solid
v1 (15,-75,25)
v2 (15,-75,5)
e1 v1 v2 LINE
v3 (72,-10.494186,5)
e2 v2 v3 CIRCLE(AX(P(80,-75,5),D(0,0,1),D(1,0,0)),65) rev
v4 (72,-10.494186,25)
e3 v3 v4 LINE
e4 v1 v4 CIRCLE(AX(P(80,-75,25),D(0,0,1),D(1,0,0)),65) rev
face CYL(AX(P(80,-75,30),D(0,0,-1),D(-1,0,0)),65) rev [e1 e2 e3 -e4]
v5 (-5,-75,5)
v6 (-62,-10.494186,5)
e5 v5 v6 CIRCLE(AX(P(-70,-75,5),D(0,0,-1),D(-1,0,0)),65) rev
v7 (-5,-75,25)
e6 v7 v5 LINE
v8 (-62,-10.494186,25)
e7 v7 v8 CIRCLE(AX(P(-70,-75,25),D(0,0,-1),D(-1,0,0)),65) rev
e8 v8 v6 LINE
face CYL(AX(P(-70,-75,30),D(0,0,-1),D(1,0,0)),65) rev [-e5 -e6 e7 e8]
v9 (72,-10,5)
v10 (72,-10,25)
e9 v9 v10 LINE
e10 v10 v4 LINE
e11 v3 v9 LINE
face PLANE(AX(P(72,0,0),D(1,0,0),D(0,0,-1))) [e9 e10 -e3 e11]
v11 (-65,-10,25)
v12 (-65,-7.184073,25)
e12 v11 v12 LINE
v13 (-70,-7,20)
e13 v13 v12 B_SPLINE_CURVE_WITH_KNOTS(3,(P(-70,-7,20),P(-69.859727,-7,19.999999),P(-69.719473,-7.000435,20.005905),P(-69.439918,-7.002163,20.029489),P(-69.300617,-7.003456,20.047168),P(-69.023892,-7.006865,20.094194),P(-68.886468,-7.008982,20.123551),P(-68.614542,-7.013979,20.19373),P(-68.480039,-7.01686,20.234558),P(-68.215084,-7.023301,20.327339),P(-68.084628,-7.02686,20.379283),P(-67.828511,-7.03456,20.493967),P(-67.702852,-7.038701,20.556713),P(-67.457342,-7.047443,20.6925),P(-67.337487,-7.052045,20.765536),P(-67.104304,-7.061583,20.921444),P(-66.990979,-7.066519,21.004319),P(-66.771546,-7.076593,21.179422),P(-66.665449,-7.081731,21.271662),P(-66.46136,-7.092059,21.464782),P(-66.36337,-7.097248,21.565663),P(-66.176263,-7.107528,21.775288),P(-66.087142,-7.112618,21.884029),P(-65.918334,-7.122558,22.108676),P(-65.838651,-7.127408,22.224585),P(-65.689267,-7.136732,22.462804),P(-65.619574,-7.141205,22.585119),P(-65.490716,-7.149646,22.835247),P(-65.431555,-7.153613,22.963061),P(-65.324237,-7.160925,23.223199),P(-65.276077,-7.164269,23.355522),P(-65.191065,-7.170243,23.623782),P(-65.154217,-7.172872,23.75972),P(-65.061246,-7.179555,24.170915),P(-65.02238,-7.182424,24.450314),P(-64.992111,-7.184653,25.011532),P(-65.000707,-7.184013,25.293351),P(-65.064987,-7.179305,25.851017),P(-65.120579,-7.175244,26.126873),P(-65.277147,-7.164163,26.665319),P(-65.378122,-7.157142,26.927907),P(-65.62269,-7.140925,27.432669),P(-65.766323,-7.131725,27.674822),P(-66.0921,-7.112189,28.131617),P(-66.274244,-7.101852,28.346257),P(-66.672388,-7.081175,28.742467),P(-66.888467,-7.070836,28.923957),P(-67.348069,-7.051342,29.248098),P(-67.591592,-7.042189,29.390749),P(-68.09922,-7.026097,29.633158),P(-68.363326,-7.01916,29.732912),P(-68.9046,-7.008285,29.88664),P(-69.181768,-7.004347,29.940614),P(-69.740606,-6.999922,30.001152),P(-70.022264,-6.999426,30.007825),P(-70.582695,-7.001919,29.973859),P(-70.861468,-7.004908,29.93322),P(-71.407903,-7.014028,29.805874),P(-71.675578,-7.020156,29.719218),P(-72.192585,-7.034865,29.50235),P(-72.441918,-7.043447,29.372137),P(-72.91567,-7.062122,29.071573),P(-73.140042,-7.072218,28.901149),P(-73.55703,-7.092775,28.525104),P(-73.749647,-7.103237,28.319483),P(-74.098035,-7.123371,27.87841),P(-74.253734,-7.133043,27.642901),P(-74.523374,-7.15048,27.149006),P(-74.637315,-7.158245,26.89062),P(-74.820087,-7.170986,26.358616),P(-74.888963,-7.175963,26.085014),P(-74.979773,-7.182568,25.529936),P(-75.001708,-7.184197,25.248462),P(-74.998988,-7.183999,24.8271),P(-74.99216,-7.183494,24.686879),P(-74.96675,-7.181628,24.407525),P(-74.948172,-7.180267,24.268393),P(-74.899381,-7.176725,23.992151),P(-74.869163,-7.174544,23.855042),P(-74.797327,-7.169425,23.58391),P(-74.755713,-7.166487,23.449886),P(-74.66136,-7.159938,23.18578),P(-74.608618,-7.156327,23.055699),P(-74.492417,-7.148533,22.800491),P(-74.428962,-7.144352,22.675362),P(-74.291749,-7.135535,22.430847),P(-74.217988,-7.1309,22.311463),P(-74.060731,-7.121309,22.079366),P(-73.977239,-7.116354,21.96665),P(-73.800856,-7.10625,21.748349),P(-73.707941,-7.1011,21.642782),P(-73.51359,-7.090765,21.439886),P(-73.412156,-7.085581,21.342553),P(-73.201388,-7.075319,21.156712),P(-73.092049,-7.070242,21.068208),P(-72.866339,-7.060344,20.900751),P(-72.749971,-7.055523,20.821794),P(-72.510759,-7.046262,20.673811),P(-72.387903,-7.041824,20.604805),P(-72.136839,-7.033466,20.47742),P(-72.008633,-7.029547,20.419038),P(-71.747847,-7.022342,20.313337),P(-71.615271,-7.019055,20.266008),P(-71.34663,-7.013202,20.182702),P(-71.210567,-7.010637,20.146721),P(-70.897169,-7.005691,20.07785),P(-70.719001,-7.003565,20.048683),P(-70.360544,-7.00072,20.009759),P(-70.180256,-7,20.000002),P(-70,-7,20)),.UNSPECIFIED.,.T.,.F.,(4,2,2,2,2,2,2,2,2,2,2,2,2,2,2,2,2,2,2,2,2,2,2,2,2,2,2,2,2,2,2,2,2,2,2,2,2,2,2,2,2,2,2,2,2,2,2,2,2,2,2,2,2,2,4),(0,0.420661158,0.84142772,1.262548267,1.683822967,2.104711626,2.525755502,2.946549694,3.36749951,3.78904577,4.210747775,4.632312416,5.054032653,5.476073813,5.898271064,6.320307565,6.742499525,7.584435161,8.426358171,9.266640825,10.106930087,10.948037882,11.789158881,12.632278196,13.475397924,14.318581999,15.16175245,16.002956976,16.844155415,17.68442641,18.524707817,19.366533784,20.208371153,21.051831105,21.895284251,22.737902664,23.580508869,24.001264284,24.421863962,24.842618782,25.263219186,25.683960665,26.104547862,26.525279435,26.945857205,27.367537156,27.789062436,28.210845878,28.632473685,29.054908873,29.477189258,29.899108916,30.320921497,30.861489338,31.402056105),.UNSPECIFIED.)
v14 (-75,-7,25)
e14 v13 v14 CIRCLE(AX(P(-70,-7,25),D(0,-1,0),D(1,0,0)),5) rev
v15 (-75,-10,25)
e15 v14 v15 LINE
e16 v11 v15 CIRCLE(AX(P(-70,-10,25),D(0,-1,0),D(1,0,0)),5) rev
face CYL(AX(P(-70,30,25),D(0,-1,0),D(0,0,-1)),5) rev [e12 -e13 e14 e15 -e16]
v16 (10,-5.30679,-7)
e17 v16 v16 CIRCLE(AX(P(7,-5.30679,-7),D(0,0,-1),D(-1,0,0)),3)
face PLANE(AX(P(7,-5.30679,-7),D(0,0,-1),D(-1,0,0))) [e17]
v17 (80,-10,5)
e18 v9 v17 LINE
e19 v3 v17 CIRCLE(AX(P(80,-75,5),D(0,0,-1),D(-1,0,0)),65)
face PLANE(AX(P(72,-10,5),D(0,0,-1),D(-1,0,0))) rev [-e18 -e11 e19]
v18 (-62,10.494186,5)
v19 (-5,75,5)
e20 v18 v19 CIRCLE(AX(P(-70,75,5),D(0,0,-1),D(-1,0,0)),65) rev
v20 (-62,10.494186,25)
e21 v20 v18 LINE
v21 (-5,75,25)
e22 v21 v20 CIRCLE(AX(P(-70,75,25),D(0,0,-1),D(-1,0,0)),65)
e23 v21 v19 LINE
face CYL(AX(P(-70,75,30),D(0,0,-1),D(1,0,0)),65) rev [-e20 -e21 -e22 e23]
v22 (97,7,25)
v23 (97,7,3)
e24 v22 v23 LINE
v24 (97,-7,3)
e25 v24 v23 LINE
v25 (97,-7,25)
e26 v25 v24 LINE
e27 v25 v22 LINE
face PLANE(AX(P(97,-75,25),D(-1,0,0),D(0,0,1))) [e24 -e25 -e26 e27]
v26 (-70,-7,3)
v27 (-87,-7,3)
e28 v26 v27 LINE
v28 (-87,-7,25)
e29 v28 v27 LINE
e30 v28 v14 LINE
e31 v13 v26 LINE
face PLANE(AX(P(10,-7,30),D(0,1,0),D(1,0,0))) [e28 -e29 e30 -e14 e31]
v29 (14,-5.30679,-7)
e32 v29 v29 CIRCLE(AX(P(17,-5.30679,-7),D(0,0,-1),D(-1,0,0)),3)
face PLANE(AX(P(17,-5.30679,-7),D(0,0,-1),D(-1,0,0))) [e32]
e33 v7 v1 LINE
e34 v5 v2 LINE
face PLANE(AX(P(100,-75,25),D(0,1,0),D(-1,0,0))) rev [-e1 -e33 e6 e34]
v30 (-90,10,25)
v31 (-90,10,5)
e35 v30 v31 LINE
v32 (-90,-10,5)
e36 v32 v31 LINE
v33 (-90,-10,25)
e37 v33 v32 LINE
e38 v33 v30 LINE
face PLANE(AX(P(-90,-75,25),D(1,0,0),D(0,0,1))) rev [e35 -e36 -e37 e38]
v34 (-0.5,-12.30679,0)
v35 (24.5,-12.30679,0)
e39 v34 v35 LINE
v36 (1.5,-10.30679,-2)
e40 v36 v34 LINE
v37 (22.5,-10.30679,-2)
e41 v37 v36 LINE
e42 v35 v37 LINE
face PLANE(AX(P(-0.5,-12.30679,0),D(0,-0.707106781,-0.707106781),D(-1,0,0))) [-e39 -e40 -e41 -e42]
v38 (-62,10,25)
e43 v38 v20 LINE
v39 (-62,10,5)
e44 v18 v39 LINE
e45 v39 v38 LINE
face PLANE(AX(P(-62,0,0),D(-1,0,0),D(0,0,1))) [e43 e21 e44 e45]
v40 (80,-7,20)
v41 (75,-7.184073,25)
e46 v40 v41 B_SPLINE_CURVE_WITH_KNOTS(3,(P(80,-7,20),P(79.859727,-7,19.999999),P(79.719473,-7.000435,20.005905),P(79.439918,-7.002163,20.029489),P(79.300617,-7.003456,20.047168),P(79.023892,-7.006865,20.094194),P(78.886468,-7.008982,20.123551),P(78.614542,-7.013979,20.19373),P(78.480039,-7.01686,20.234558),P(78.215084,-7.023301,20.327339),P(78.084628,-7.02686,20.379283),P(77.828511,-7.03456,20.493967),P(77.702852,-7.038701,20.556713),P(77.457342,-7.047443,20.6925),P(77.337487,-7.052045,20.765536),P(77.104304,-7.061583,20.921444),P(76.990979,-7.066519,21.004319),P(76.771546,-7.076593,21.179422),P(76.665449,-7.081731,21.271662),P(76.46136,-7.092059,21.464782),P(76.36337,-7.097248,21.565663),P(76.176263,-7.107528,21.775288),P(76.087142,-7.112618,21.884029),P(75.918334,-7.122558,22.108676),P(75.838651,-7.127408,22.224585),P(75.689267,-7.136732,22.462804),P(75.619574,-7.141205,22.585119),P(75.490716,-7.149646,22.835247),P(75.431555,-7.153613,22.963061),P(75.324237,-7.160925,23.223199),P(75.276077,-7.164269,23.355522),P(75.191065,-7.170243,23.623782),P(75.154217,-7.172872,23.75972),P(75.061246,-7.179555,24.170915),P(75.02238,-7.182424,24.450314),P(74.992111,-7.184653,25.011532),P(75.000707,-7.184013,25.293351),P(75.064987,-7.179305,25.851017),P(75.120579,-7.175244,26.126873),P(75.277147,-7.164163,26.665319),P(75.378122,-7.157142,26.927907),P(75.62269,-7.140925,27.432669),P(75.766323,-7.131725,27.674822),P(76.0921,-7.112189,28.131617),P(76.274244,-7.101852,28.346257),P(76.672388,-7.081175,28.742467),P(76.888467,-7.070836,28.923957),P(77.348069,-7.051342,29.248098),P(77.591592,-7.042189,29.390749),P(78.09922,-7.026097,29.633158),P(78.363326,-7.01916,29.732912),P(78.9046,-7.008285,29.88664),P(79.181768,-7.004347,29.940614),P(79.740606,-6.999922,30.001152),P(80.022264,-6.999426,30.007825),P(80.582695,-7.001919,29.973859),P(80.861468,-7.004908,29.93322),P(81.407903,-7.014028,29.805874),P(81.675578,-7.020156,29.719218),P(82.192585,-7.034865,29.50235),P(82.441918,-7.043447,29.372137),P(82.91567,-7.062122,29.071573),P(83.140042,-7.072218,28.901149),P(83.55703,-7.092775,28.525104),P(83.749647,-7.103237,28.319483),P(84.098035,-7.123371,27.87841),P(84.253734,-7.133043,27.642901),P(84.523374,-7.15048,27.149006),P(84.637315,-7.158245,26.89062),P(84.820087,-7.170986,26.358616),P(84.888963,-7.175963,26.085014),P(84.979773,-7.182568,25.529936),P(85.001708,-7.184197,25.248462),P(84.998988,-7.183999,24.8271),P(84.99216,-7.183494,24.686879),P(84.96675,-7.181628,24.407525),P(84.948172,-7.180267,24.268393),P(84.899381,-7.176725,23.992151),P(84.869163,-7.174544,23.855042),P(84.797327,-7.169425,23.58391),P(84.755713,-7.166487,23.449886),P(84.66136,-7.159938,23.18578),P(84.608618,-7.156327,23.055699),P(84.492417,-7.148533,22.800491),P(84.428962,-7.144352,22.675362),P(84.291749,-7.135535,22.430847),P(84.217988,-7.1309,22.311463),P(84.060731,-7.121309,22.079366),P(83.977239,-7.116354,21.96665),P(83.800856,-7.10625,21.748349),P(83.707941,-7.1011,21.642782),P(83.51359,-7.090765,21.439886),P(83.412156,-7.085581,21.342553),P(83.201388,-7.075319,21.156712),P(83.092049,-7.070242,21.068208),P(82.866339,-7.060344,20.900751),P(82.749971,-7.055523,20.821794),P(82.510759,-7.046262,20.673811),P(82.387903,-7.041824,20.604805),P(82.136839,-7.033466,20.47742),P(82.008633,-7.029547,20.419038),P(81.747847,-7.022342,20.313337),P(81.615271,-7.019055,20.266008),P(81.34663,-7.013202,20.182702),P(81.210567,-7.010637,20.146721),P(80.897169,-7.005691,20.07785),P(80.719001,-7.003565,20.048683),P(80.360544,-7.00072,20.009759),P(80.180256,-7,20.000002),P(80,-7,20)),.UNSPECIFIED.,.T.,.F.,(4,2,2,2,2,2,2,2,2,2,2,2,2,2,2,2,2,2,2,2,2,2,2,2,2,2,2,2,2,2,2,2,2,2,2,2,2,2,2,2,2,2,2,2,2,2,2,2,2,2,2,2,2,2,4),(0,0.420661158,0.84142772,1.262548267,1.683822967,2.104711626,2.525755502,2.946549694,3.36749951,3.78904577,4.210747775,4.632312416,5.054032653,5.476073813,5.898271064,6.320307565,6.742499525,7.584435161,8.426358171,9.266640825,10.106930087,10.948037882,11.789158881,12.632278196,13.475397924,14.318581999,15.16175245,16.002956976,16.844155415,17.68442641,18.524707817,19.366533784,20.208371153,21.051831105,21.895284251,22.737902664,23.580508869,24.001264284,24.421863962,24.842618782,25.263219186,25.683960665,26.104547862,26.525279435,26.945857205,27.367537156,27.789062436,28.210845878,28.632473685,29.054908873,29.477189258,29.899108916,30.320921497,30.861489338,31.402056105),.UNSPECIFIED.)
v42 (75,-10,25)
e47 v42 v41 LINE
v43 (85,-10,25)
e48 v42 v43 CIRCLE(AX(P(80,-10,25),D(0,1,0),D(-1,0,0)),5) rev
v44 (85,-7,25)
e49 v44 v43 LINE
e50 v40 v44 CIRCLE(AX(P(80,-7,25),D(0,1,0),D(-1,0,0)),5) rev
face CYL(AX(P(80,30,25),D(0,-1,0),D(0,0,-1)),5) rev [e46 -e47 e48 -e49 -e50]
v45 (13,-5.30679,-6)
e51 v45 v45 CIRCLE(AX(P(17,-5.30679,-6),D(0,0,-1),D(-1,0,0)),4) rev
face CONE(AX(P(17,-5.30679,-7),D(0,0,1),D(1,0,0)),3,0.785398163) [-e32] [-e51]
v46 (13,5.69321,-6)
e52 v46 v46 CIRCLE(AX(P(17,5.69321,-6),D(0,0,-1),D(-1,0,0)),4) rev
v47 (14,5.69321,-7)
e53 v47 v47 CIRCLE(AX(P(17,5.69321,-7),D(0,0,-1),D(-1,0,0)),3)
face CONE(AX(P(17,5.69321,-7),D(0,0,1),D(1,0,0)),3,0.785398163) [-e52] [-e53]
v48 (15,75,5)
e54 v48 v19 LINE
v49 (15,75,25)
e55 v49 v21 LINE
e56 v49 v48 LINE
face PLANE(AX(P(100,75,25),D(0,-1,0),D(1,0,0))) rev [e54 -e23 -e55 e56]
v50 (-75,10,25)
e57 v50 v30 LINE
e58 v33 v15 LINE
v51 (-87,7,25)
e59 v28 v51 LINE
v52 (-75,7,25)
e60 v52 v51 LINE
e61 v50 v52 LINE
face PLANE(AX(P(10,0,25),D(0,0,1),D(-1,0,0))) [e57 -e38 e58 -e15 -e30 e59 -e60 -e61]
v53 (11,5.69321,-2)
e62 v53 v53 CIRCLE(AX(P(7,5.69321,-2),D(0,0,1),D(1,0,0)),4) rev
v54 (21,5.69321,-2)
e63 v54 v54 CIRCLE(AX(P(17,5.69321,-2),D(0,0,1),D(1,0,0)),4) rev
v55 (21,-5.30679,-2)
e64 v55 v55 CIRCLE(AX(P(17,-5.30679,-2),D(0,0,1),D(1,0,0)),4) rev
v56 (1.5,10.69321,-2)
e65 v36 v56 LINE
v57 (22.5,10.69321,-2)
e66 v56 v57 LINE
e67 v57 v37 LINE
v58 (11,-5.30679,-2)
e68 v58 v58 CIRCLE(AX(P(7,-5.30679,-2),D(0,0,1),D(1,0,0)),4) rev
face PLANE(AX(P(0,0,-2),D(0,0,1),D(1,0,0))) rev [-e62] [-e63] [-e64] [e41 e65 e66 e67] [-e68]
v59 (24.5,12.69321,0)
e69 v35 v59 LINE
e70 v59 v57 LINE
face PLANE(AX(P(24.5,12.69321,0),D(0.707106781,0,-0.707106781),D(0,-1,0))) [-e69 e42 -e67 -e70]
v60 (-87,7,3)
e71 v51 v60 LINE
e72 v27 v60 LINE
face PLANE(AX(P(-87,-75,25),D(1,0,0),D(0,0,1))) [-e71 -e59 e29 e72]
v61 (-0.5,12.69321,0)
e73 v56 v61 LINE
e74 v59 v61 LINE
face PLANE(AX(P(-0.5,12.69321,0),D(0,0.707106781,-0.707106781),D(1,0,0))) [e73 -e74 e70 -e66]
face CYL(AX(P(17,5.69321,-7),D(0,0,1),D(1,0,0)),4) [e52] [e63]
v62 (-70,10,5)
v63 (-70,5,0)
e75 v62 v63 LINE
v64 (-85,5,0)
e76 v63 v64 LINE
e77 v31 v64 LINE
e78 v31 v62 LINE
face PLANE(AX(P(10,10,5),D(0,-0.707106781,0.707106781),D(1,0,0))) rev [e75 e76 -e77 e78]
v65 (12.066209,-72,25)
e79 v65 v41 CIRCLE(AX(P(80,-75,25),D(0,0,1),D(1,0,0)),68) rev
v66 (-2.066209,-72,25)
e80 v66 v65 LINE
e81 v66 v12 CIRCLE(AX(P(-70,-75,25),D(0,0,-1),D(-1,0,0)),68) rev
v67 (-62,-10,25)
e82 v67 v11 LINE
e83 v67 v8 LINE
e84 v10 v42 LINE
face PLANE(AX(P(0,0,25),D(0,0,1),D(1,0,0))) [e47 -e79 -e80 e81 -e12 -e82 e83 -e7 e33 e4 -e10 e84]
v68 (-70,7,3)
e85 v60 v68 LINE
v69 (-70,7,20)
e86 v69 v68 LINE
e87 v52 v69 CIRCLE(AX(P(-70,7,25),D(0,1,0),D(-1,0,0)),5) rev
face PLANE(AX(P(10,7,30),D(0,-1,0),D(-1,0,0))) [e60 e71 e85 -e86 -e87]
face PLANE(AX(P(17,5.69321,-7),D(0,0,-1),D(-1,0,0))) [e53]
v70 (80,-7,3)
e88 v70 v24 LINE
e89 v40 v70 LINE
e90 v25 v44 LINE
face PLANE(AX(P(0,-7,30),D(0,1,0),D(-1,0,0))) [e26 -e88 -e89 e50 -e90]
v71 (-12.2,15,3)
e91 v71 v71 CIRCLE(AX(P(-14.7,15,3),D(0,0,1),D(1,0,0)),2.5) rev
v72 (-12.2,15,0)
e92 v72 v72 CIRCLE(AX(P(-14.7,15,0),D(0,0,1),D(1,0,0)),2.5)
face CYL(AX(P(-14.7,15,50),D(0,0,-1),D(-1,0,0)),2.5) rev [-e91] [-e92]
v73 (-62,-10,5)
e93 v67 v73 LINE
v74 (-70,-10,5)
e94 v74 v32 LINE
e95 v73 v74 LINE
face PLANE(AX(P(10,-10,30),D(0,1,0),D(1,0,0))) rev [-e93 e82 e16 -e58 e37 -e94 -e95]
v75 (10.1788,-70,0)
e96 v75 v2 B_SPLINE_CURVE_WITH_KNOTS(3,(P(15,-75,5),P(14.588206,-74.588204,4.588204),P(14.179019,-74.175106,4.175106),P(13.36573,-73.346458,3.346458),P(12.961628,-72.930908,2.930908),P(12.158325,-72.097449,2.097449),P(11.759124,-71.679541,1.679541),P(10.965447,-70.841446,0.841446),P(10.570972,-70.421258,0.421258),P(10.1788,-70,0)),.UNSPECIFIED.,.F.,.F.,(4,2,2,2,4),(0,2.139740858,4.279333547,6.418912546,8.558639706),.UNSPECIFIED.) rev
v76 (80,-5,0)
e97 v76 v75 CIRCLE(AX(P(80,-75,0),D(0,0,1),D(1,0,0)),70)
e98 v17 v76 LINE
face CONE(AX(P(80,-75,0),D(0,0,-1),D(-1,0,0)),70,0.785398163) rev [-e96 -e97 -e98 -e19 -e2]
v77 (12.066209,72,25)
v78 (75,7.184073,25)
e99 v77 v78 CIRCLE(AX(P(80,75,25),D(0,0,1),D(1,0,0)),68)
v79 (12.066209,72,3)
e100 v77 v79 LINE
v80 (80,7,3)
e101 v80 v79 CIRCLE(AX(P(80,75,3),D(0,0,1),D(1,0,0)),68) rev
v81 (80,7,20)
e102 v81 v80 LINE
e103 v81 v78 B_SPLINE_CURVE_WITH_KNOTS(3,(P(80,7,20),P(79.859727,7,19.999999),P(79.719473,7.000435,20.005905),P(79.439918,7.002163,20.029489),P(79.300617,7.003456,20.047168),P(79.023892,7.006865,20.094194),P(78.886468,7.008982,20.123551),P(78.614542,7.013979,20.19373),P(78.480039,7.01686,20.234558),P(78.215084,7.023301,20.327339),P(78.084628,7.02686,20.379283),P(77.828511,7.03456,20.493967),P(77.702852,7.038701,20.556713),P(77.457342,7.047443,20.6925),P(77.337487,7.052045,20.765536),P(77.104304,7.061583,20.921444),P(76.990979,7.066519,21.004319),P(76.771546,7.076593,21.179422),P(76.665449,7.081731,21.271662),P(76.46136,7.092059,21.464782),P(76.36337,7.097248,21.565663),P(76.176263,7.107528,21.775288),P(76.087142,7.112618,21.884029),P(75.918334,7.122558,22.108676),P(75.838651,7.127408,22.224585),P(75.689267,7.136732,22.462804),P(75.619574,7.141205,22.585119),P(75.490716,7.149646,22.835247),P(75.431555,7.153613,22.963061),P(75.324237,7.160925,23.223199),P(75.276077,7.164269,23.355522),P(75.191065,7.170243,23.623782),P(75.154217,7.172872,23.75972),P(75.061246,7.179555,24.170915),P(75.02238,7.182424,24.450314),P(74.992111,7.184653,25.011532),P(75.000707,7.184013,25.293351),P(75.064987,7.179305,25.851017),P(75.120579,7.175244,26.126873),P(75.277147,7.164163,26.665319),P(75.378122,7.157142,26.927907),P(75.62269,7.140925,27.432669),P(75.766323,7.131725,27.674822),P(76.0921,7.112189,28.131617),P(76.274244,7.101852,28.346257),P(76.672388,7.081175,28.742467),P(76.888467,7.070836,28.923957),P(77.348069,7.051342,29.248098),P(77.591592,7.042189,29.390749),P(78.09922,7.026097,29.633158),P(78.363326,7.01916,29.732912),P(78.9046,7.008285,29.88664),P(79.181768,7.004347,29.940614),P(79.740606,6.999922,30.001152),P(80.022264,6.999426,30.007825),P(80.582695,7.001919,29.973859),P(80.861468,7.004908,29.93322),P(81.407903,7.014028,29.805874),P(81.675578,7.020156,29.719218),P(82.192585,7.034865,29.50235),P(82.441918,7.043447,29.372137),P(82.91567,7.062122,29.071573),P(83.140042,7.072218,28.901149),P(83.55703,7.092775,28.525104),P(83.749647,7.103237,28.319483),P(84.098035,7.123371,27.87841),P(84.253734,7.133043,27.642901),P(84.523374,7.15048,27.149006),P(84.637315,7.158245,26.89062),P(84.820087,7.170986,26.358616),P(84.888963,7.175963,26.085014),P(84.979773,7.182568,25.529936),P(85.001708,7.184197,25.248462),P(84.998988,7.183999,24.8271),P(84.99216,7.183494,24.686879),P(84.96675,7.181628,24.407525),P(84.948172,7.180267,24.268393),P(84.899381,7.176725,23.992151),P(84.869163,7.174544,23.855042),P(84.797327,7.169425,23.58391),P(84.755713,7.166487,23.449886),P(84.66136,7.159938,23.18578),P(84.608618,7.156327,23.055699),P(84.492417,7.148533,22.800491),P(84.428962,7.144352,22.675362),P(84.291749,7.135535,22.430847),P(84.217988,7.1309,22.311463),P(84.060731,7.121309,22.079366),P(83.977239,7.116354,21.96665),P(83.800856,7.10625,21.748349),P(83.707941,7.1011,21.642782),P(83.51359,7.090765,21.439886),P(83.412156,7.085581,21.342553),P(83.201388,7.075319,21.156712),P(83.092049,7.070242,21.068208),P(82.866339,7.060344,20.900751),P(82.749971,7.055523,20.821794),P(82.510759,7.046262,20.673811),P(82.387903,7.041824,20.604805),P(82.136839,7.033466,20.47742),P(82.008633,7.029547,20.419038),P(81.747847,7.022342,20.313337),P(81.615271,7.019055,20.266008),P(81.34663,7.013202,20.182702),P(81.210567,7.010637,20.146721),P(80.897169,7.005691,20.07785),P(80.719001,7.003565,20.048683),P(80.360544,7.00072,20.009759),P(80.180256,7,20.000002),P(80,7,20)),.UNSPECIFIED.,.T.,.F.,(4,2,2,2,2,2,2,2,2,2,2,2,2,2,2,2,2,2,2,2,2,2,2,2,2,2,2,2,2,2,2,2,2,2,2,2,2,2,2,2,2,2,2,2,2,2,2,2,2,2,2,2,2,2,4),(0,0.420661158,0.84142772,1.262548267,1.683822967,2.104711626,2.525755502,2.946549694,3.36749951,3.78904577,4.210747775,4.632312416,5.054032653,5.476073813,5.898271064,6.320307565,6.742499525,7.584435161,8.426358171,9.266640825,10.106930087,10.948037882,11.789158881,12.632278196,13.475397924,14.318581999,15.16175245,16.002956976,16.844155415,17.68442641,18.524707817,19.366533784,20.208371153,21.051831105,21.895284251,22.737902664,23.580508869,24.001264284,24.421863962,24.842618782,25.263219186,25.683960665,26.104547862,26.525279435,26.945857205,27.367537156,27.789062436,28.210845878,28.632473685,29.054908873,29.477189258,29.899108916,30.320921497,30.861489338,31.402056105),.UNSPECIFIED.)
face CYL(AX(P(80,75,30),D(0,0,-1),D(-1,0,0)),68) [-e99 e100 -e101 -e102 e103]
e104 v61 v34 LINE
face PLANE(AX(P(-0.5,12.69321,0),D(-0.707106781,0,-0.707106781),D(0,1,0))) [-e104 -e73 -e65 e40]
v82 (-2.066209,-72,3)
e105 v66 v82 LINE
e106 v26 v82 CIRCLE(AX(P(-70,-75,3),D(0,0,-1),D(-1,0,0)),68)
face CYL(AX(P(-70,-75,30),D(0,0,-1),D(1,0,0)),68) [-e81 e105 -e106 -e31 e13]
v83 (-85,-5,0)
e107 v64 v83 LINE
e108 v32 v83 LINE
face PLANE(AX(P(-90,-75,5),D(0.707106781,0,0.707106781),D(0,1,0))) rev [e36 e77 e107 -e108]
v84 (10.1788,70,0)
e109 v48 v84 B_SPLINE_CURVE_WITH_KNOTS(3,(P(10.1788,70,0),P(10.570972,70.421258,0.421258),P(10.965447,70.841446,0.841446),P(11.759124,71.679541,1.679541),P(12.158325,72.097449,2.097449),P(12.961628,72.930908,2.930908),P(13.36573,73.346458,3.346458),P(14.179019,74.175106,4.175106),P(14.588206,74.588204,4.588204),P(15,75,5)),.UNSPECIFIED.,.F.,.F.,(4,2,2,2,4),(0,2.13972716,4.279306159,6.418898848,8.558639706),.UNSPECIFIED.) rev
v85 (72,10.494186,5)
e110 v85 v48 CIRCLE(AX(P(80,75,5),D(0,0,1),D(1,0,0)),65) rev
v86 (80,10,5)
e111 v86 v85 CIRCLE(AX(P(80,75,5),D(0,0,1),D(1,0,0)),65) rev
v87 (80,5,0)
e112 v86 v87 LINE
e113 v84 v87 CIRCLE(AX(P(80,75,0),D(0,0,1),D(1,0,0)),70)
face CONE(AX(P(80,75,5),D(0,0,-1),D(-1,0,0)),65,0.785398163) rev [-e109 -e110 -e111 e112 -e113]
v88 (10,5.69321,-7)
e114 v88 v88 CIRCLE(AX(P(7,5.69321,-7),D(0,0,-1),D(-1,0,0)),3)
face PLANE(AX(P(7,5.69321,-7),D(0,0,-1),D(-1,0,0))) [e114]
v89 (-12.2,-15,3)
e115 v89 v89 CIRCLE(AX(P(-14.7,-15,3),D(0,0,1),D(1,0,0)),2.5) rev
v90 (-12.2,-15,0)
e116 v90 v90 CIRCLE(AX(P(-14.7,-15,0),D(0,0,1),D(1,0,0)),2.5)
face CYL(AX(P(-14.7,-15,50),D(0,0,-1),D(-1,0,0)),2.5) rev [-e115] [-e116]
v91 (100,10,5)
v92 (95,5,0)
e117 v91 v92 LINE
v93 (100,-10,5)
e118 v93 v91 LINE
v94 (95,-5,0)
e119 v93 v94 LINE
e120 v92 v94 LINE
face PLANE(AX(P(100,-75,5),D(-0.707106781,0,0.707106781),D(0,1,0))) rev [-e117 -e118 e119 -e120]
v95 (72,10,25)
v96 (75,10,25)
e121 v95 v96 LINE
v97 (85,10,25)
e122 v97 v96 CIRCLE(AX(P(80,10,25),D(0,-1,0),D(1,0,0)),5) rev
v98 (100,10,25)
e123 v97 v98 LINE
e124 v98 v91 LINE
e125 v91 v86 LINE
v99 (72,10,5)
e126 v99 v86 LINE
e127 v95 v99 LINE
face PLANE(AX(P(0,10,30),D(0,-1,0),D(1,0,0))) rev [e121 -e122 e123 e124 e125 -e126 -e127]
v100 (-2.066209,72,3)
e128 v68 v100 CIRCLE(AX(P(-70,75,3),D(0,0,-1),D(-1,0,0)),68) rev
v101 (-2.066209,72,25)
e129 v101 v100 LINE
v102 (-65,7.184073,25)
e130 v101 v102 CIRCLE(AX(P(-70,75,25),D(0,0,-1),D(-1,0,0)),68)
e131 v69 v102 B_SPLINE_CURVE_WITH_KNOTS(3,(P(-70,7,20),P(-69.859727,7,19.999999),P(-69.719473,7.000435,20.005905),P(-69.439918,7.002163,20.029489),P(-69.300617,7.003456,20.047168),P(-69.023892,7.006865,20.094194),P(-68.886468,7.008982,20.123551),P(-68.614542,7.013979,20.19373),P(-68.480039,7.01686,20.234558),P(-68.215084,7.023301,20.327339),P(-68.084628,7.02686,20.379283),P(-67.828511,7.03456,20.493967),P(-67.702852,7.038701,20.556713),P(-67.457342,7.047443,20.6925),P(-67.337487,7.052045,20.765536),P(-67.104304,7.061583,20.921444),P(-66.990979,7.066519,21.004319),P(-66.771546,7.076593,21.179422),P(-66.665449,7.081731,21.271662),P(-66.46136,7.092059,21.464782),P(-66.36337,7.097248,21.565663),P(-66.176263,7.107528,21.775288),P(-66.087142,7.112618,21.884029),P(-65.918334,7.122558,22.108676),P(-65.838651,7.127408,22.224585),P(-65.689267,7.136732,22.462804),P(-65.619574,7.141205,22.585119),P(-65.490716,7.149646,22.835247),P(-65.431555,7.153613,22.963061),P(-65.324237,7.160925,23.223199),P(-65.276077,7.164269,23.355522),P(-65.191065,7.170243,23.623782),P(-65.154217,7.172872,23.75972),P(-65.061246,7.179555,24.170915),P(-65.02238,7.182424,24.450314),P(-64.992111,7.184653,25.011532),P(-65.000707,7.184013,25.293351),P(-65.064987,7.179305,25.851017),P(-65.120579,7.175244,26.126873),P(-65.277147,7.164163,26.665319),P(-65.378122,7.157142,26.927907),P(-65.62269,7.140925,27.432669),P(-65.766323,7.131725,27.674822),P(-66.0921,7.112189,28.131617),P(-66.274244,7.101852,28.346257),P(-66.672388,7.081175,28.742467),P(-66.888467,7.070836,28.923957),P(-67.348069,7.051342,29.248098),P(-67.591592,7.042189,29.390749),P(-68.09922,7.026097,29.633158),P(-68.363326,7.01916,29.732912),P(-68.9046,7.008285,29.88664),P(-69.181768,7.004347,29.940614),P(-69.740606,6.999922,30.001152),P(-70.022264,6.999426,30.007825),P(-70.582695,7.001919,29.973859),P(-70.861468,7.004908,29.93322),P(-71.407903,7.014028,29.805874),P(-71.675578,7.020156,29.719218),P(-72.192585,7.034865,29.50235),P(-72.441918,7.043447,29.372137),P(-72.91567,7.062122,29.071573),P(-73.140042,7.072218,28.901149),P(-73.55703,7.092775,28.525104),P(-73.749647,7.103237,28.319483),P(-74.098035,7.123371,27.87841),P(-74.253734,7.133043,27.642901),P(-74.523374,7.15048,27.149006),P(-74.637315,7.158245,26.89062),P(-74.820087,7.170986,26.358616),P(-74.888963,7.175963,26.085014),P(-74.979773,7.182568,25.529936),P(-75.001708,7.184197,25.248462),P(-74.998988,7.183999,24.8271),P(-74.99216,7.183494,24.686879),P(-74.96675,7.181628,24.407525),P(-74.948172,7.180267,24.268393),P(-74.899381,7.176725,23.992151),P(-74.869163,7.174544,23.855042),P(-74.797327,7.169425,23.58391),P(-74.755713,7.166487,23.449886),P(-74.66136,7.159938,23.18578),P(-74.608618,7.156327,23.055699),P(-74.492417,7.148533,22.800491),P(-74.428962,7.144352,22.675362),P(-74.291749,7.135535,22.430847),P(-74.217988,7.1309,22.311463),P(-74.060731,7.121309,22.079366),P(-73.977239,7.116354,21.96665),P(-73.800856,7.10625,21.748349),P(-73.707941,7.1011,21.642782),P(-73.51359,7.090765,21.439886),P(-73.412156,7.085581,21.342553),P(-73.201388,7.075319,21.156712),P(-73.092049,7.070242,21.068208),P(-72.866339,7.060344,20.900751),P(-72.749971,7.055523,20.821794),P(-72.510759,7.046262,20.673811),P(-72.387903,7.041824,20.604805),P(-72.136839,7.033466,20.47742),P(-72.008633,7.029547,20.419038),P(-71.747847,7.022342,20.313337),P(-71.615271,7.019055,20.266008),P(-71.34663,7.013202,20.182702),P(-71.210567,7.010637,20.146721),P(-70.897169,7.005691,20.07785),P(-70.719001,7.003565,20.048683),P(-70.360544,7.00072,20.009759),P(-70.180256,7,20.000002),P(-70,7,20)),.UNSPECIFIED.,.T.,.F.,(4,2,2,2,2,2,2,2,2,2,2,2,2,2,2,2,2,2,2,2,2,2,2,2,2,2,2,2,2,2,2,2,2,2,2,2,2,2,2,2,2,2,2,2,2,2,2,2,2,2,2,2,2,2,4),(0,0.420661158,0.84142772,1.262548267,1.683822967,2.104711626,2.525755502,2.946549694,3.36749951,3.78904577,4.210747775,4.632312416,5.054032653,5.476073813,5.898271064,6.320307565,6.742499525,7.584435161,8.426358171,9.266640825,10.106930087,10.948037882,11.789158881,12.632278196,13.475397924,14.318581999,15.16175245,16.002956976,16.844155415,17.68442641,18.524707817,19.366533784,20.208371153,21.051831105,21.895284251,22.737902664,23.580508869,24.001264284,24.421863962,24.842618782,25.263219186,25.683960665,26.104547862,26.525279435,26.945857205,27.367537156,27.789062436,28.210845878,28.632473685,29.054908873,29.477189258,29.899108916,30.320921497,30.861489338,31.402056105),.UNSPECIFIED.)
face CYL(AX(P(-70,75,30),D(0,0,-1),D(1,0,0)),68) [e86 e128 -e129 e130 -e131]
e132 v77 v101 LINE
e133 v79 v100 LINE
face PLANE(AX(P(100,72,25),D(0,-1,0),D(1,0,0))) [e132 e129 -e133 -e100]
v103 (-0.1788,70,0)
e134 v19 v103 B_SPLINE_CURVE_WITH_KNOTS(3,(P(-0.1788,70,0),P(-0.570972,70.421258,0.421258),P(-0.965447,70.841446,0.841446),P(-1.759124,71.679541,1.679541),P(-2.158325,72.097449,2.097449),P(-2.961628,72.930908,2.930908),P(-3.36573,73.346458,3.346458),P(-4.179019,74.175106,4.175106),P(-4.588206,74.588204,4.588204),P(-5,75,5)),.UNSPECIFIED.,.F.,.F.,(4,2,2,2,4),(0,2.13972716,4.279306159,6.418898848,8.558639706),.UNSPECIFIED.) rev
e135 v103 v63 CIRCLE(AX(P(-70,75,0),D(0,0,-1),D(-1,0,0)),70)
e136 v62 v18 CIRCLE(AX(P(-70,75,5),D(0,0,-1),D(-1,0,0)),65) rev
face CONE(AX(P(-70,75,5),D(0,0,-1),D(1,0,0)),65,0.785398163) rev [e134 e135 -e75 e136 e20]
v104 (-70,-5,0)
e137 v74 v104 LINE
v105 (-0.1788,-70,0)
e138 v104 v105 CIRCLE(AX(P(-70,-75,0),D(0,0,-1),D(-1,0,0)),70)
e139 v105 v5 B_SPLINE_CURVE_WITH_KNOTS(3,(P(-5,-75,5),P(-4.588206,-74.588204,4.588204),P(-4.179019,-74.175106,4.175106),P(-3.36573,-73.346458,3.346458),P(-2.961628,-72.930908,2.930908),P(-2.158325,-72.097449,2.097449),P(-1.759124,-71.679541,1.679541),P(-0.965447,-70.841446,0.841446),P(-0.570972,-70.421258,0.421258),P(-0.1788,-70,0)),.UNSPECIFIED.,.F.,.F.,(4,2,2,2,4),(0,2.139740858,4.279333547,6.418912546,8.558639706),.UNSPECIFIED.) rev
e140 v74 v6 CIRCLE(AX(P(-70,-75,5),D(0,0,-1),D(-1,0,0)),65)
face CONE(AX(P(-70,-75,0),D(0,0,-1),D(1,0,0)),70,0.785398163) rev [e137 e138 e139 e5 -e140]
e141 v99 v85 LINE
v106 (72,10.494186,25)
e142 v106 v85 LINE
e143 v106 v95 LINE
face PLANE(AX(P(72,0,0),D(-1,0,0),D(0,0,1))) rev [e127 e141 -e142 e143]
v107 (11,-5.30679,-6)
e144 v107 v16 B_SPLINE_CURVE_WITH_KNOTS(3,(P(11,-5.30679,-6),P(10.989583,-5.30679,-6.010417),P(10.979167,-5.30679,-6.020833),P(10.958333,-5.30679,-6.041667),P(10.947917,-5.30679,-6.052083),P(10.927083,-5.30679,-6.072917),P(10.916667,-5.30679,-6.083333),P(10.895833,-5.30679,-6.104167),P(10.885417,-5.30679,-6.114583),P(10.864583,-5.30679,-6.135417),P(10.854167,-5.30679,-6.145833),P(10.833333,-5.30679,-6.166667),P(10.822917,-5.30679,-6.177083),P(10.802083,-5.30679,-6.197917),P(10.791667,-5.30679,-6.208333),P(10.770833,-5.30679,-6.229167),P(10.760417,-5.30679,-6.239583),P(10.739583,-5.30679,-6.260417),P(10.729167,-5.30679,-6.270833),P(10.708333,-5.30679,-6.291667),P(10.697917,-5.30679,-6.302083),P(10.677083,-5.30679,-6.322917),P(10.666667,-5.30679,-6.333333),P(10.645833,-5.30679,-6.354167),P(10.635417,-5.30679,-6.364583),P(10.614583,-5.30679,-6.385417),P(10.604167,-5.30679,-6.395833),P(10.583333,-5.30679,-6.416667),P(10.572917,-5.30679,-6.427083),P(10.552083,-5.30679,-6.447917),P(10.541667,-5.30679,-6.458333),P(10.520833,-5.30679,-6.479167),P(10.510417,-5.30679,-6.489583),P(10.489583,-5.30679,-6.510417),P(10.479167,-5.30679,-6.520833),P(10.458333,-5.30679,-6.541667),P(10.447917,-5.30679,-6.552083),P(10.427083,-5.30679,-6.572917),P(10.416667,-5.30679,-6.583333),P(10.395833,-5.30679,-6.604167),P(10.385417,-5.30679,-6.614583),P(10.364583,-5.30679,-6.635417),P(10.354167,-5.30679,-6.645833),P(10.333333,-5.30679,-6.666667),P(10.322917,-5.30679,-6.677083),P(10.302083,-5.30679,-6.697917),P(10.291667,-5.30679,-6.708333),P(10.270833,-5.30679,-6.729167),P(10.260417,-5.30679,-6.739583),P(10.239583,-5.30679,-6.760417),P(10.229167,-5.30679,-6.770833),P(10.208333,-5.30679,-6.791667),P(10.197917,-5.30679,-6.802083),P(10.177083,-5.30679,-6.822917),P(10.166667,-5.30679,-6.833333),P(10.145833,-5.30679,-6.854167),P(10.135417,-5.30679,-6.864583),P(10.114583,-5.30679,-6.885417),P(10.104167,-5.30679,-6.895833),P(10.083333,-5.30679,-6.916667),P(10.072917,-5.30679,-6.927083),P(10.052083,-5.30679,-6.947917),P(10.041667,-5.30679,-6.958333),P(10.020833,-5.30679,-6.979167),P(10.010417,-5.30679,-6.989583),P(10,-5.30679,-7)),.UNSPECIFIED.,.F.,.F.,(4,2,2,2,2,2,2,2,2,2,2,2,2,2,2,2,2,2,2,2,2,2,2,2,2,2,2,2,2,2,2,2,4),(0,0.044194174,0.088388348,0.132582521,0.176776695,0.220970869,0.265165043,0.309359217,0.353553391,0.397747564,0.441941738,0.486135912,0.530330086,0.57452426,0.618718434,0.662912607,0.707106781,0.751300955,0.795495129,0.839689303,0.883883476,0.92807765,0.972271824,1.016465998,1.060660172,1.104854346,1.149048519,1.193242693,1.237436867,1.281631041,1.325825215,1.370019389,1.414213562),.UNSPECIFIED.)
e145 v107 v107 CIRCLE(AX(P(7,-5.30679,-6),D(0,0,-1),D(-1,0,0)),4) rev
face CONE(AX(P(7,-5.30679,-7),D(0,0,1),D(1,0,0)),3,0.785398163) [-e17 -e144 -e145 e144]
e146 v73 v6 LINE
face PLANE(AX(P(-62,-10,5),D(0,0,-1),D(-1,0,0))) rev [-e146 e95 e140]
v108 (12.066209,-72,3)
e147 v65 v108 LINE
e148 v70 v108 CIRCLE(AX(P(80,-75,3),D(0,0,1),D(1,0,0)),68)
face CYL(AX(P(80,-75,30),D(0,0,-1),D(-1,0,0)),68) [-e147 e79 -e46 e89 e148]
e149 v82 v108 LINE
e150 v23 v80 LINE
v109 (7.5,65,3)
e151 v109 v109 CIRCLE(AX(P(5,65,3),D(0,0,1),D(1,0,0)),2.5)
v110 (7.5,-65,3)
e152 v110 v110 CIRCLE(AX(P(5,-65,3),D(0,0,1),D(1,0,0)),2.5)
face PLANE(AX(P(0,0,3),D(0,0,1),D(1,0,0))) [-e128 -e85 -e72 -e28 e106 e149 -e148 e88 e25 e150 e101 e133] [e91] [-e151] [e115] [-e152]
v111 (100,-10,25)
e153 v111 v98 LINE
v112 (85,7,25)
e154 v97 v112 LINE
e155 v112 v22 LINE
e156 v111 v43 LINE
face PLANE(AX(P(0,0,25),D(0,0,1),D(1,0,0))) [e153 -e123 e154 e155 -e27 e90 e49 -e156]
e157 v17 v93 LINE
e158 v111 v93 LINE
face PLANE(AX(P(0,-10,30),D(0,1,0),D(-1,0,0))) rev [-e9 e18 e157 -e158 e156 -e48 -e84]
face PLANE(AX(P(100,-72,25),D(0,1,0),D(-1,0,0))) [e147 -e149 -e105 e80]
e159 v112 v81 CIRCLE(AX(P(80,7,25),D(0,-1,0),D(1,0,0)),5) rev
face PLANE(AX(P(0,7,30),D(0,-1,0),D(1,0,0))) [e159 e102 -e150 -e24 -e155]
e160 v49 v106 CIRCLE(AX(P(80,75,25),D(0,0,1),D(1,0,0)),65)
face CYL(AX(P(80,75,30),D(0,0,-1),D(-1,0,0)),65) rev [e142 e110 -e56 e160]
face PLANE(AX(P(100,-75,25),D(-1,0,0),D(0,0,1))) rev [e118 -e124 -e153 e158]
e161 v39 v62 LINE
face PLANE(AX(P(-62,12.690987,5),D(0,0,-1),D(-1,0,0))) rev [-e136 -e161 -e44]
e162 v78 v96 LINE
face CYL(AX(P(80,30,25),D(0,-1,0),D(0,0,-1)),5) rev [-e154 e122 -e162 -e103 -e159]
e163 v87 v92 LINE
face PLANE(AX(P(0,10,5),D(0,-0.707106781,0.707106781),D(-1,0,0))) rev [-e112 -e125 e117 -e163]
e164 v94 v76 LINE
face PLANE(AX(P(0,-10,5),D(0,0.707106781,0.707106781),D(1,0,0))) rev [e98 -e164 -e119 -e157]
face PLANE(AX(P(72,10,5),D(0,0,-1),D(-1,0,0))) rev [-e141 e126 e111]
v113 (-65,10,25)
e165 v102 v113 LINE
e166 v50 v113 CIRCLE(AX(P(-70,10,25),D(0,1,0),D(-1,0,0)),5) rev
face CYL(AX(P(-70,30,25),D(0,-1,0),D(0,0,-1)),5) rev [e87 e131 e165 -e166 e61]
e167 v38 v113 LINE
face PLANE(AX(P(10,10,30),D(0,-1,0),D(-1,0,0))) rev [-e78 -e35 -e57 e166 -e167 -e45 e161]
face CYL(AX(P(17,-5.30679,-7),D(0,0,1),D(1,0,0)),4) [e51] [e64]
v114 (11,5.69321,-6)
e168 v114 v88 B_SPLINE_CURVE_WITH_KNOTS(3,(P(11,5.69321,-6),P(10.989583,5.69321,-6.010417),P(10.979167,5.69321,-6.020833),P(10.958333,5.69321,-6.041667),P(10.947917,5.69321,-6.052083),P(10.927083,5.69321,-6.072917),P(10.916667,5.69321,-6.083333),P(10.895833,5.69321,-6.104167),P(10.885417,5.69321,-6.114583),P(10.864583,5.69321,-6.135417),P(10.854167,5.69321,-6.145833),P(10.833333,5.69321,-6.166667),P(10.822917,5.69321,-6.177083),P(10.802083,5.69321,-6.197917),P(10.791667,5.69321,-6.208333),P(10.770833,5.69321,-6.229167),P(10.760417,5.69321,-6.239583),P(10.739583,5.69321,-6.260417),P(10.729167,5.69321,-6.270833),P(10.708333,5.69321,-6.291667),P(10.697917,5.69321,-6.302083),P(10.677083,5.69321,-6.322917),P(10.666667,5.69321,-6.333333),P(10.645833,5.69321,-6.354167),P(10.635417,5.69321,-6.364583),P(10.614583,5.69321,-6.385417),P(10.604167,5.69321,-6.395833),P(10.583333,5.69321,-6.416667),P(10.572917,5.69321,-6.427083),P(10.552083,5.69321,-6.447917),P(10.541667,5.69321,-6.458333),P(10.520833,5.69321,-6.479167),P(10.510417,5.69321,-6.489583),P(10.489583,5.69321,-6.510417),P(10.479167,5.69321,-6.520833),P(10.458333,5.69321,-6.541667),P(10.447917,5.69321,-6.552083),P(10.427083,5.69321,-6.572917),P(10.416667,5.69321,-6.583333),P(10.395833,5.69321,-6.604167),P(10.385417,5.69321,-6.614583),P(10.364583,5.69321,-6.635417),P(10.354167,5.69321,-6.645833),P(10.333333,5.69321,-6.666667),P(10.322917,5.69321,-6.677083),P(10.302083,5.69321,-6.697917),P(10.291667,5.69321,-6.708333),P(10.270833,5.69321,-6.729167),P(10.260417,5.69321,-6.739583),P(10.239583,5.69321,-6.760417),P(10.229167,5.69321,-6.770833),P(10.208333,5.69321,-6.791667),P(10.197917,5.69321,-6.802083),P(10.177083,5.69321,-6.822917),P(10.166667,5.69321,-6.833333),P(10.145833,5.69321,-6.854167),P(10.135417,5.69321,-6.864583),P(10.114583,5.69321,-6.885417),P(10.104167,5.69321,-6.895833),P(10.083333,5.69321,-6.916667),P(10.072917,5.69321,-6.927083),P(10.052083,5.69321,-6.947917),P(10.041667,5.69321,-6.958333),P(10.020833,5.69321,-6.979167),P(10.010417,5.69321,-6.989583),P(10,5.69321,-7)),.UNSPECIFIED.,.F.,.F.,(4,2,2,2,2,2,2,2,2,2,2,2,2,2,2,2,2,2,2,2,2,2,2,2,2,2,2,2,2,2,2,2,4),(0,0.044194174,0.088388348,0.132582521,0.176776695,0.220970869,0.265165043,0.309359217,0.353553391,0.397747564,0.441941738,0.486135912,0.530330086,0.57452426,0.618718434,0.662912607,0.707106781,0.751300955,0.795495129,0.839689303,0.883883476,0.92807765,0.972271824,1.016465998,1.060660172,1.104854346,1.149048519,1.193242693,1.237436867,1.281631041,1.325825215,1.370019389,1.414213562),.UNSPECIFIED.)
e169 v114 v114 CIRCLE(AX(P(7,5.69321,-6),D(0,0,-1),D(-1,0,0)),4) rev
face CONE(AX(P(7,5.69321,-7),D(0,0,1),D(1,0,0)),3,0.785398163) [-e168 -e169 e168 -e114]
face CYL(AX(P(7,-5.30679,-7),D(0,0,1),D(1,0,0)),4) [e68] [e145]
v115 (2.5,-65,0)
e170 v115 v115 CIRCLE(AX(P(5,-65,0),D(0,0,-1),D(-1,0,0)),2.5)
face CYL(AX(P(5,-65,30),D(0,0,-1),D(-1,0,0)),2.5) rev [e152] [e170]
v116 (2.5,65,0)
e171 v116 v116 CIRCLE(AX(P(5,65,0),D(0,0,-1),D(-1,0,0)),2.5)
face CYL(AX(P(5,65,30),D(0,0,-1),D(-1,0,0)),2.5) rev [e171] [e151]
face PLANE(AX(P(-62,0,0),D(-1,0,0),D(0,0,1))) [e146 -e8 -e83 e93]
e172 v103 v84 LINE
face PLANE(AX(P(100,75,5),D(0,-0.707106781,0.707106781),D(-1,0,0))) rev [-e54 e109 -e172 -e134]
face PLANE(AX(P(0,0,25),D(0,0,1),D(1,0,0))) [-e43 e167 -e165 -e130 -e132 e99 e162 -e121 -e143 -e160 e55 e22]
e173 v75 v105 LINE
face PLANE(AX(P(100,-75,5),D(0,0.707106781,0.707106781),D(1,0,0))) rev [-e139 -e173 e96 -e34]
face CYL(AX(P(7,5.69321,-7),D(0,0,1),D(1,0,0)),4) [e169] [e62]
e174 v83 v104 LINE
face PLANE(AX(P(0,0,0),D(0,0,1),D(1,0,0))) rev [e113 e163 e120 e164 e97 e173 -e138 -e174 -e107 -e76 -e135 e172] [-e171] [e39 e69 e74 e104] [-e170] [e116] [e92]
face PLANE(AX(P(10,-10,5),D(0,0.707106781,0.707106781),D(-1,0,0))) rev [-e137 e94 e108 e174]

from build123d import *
from build123d.topology import SkipClean

# Parameters (mm, degrees)
SKETCH1_W               = 200
SKETCH1_H               = 150
BOSS_EXTRUDE1_DEPTH     = 25
CUT_EXTRUDE2_DEPTH      = 30
SHELL2_T                = -3
SKETCH6_R               = 2.5
CUT_EXTRUDE3_DEPTH      = 30
CUT_EXTRUDE4_DEPTH      = 30
CUT_EXTRUDE4_DEPTH_BACK = 30
SKETCH7_R               = 5
CHAMFER1_SIZE           = 5
SKETCH8_R               = 2.5
CUT_EXTRUDE5_DEPTH      = 10
SKETCH9_W               = 105
SKETCH9_H               = 150
CUT_EXTRUDE8_DEPTH      = 50
SKETCH10_R              = 2.5
CUT_EXTRUDE9_DEPTH      = 50
SKETCH11_W              = 20
SKETCH11_H              = 2.690986913
SKETCH11_W_2            = 20.020411306
SKETCH11_H_2            = 2.771183394
CUT_EXTRUDE10_DEPTH     = 28
SKETCH12_W              = 20
SKETCH12_H              = 3.926823093
CUT_EXTRUDE11_DEPTH     = 28
SKETCH_1_W              = 25
SKETCH_1_H              = 25
EXTRUDE_1_DEPTH         = 5
CHAMFER_1_SIZE          = 2
SKETCH_2_R              = 4
EXTRUDE_2_DEPTH         = 5
CHAMFER_4_SIZE          = 1


with BuildPart() as part:
    # Sketch1 → Boss-Extrude1 (new body)
    with BuildSketch(Plane.XY):
        Rectangle(SKETCH1_W, SKETCH1_H)
    extrude(amount=BOSS_EXTRUDE1_DEPTH)

    # Sketch5 → Cut-Extrude2 (cut)
    with BuildSketch(Plane(origin=(0, 0, 0), x_dir=(-1, 0, 0), z_dir=(0, 0, -1))):
        with BuildLine():
            Line((100, 75), (5, 75))
            ThreePointArc((5, 75), (24.038059223, 29.038059223), (70, 10))
            Line((70, 10), (100, 10))
            Line((100, 10), (100, 75))
        make_face()
        with BuildLine():
            ThreePointArc((70, -10), (24.038059223, -29.038059223), (5, -75))
            Line((5, -75), (100, -75))
            Line((100, -75), (100, -10))
            Line((100, -10), (70, -10))
        make_face()
        with BuildLine():
            Line((-80, -10), (-100, -10))
            Line((-100, -10), (-100, -75))
            Line((-100, -75), (-15, -75))
            ThreePointArc((-15, -75), (-34.038059223, -29.038059223), (-80, -10))
        make_face()
        with BuildLine():
            Line((-100, 75), (-100, 10))
            Line((-100, 10), (-80, 10))
            ThreePointArc((-80, 10), (-34.038059223, 29.038059223), (-15, 75))
            Line((-15, 75), (-100, 75))
        make_face()
    extrude(amount=-CUT_EXTRUDE2_DEPTH, mode=Mode.SUBTRACT)

    # Shell2
    shell2_openings = [part.faces().sort_by_distance(p)[0] for p in [
        (3.044348512, 0, 25),
    ]]
    offset(amount=SHELL2_T, openings=shell2_openings, kind=Kind.INTERSECTION)

    # Sketch6 → Cut-Extrude3 (cut)
    with BuildSketch(Plane(origin=(0, 0, 0), x_dir=(-1, 0, 0), z_dir=(0, 0, -1))):
        with Locations((-5, 65)):
            Circle(SKETCH6_R)
        with Locations((-5, -65)):
            Circle(SKETCH6_R)
    extrude(amount=-CUT_EXTRUDE3_DEPTH, mode=Mode.SUBTRACT)

    # Sketch7 → Cut-Extrude4 (cut, two sides: drawn at the far end of the back side and taken through both)
    with BuildSketch(Plane(origin=(0, 0, 0), x_dir=(1, 0, 0), z_dir=(0, 1, 0)).offset(-CUT_EXTRUDE4_DEPTH_BACK)):
        with Locations((-80, -25)):
            Circle(SKETCH7_R)
        with Locations((80, -25)):
            Circle(SKETCH7_R)
    extrude(amount=CUT_EXTRUDE4_DEPTH + CUT_EXTRUDE4_DEPTH_BACK, mode=Mode.SUBTRACT)

    # Chamfer1
    chamfer1_edges = [part.edges().sort_by_distance(p)[0] for p in [
        (-100, 0, 0),
        (5, 75, 0),
        (100, 0, 0),
        (5, -75, 0),
        (90, 10, 0),
        (34.038059223, 29.038059223, 0),
        (34.038059223, -29.038059223, 0),
        (90, -10, 0),
        (-24.038059223, -29.038059223, 0),
        (-85, -10, 0),
        (-24.038059223, 29.038059223, 0),
        (-85, 10, 0),
    ]]
    chamfer(chamfer1_edges, length=CHAMFER1_SIZE)

    # Sketch8 → Cut-Extrude5 (cut)
    with BuildSketch(Plane.XY.offset(3)):
        with Locations((-22, 15)):
            Circle(SKETCH8_R)
        with Locations((-22, -15)):
            Circle(SKETCH8_R)
    extrude(amount=-CUT_EXTRUDE5_DEPTH, mode=Mode.SUBTRACT)

    # Sketch9 → Cut-Extrude8 (cut)
    with BuildSketch(Plane.XY):
        with Locations((-47.5, 0)):
            Rectangle(SKETCH9_W, SKETCH9_H)
    extrude(amount=CUT_EXTRUDE8_DEPTH, mode=Mode.SUBTRACT)

    # Mirror4: part across plane


with BuildPart() as part_1:
    with SkipClean():  # the faces are left unmerged after this step: merging them gives an invalid solid
        add(part.part)
        add(part.part.mirror(Plane(origin=(5, 75, 50), x_dir=(0, 0, 1), z_dir=(-1, 0, 0))))

    # Sketch10 → Cut-Extrude9 (cut)
    with SkipClean():  # the faces are left unmerged after this step: merging them gives an invalid solid
        with BuildSketch(Plane.XY):
            with Locations((-14.7, 15)):
                Circle(SKETCH10_R)
            with Locations((-14.7, -15)):
                Circle(SKETCH10_R)
        extrude(amount=CUT_EXTRUDE9_DEPTH, mode=Mode.SUBTRACT)

    # Sketch11 → Cut-Extrude10 (cut)
    with SkipClean():  # the faces are left unmerged after this step: merging them gives an invalid solid
        with BuildSketch(Plane.ZY.offset(90)):
            with Locations((15, 11.345493457)):
                Rectangle(SKETCH11_W, SKETCH11_H)
            with Locations((15.010205653, -11.385591697)):
                Rectangle(SKETCH11_W_2, SKETCH11_H_2)
        extrude(amount=-CUT_EXTRUDE10_DEPTH, mode=Mode.SUBTRACT)

    # Sketch12 → Cut-Extrude11 (cut)
    with SkipClean():  # the faces are left unmerged after this step: merging them gives an invalid solid
        with BuildSketch(Plane(origin=(100, 0, 0), x_dir=(0, 0, -1), z_dir=(1, 0, 0))):
            with Locations((-15, 11.963411547)):
                Rectangle(SKETCH12_W, SKETCH12_H)
            with Locations((-15, -11.963411547)):
                Rectangle(SKETCH12_W, SKETCH12_H)
        extrude(amount=-CUT_EXTRUDE11_DEPTH, mode=Mode.SUBTRACT)

    # 草图1 → 凸台-拉伸1 (add)
    with SkipClean():  # the faces are left unmerged after this step: merging them gives an invalid solid
        with BuildSketch(Plane.XY.offset(3)):
            with Locations((12, 0.193209558)):
                Rectangle(SKETCH_1_W, SKETCH_1_H)
        extrude(amount=-EXTRUDE_1_DEPTH)

    # 倒角1
    chamfer_1_edges = [part_1.edges().sort_by_distance(p)[0] for p in [
        (12, 12.693209558, -2),
        (-0.5, 0.193209558, -2),
        (12, -12.306790442, -2),
        (24.5, 0.193209558, -2),
    ]]
    chamfer(chamfer_1_edges, length=CHAMFER_1_SIZE - 0.0001)  # a hair under: the kernel refuses the full size

    # 草图2 → 凸台-拉伸2 (add)
    with BuildSketch(Plane(origin=(0, 0, -2), x_dir=(-1, 0, 0), z_dir=(0, 0, -1))):
        with Locations(Location((-17, 5.693209558, 0), (0, 0, 180))):
            Circle(SKETCH_2_R)
        with Locations(Location((-7, 5.693209558, 0), (0, 0, 180))):
            Circle(SKETCH_2_R)
        with Locations(Location((-17, -5.306790442, 0), (0, 0, 180))):
            Circle(SKETCH_2_R)
        with Locations(Location((-7, -5.306790442, 0), (0, 0, 180))):
            Circle(SKETCH_2_R)
    extrude(amount=EXTRUDE_2_DEPTH)

    # 倒角4
    chamfer_4_edges = [part_1.edges().sort_by_distance(p)[0] for p in [
        (13, 5.693209558, -7),
        (13, -5.306790442, -7),
        (3, 5.693209558, -7),
        (3, -5.306790442, -7),
    ]]
    chamfer(chamfer_4_edges, length=CHAMFER_4_SIZE)


solid = part_1.part
